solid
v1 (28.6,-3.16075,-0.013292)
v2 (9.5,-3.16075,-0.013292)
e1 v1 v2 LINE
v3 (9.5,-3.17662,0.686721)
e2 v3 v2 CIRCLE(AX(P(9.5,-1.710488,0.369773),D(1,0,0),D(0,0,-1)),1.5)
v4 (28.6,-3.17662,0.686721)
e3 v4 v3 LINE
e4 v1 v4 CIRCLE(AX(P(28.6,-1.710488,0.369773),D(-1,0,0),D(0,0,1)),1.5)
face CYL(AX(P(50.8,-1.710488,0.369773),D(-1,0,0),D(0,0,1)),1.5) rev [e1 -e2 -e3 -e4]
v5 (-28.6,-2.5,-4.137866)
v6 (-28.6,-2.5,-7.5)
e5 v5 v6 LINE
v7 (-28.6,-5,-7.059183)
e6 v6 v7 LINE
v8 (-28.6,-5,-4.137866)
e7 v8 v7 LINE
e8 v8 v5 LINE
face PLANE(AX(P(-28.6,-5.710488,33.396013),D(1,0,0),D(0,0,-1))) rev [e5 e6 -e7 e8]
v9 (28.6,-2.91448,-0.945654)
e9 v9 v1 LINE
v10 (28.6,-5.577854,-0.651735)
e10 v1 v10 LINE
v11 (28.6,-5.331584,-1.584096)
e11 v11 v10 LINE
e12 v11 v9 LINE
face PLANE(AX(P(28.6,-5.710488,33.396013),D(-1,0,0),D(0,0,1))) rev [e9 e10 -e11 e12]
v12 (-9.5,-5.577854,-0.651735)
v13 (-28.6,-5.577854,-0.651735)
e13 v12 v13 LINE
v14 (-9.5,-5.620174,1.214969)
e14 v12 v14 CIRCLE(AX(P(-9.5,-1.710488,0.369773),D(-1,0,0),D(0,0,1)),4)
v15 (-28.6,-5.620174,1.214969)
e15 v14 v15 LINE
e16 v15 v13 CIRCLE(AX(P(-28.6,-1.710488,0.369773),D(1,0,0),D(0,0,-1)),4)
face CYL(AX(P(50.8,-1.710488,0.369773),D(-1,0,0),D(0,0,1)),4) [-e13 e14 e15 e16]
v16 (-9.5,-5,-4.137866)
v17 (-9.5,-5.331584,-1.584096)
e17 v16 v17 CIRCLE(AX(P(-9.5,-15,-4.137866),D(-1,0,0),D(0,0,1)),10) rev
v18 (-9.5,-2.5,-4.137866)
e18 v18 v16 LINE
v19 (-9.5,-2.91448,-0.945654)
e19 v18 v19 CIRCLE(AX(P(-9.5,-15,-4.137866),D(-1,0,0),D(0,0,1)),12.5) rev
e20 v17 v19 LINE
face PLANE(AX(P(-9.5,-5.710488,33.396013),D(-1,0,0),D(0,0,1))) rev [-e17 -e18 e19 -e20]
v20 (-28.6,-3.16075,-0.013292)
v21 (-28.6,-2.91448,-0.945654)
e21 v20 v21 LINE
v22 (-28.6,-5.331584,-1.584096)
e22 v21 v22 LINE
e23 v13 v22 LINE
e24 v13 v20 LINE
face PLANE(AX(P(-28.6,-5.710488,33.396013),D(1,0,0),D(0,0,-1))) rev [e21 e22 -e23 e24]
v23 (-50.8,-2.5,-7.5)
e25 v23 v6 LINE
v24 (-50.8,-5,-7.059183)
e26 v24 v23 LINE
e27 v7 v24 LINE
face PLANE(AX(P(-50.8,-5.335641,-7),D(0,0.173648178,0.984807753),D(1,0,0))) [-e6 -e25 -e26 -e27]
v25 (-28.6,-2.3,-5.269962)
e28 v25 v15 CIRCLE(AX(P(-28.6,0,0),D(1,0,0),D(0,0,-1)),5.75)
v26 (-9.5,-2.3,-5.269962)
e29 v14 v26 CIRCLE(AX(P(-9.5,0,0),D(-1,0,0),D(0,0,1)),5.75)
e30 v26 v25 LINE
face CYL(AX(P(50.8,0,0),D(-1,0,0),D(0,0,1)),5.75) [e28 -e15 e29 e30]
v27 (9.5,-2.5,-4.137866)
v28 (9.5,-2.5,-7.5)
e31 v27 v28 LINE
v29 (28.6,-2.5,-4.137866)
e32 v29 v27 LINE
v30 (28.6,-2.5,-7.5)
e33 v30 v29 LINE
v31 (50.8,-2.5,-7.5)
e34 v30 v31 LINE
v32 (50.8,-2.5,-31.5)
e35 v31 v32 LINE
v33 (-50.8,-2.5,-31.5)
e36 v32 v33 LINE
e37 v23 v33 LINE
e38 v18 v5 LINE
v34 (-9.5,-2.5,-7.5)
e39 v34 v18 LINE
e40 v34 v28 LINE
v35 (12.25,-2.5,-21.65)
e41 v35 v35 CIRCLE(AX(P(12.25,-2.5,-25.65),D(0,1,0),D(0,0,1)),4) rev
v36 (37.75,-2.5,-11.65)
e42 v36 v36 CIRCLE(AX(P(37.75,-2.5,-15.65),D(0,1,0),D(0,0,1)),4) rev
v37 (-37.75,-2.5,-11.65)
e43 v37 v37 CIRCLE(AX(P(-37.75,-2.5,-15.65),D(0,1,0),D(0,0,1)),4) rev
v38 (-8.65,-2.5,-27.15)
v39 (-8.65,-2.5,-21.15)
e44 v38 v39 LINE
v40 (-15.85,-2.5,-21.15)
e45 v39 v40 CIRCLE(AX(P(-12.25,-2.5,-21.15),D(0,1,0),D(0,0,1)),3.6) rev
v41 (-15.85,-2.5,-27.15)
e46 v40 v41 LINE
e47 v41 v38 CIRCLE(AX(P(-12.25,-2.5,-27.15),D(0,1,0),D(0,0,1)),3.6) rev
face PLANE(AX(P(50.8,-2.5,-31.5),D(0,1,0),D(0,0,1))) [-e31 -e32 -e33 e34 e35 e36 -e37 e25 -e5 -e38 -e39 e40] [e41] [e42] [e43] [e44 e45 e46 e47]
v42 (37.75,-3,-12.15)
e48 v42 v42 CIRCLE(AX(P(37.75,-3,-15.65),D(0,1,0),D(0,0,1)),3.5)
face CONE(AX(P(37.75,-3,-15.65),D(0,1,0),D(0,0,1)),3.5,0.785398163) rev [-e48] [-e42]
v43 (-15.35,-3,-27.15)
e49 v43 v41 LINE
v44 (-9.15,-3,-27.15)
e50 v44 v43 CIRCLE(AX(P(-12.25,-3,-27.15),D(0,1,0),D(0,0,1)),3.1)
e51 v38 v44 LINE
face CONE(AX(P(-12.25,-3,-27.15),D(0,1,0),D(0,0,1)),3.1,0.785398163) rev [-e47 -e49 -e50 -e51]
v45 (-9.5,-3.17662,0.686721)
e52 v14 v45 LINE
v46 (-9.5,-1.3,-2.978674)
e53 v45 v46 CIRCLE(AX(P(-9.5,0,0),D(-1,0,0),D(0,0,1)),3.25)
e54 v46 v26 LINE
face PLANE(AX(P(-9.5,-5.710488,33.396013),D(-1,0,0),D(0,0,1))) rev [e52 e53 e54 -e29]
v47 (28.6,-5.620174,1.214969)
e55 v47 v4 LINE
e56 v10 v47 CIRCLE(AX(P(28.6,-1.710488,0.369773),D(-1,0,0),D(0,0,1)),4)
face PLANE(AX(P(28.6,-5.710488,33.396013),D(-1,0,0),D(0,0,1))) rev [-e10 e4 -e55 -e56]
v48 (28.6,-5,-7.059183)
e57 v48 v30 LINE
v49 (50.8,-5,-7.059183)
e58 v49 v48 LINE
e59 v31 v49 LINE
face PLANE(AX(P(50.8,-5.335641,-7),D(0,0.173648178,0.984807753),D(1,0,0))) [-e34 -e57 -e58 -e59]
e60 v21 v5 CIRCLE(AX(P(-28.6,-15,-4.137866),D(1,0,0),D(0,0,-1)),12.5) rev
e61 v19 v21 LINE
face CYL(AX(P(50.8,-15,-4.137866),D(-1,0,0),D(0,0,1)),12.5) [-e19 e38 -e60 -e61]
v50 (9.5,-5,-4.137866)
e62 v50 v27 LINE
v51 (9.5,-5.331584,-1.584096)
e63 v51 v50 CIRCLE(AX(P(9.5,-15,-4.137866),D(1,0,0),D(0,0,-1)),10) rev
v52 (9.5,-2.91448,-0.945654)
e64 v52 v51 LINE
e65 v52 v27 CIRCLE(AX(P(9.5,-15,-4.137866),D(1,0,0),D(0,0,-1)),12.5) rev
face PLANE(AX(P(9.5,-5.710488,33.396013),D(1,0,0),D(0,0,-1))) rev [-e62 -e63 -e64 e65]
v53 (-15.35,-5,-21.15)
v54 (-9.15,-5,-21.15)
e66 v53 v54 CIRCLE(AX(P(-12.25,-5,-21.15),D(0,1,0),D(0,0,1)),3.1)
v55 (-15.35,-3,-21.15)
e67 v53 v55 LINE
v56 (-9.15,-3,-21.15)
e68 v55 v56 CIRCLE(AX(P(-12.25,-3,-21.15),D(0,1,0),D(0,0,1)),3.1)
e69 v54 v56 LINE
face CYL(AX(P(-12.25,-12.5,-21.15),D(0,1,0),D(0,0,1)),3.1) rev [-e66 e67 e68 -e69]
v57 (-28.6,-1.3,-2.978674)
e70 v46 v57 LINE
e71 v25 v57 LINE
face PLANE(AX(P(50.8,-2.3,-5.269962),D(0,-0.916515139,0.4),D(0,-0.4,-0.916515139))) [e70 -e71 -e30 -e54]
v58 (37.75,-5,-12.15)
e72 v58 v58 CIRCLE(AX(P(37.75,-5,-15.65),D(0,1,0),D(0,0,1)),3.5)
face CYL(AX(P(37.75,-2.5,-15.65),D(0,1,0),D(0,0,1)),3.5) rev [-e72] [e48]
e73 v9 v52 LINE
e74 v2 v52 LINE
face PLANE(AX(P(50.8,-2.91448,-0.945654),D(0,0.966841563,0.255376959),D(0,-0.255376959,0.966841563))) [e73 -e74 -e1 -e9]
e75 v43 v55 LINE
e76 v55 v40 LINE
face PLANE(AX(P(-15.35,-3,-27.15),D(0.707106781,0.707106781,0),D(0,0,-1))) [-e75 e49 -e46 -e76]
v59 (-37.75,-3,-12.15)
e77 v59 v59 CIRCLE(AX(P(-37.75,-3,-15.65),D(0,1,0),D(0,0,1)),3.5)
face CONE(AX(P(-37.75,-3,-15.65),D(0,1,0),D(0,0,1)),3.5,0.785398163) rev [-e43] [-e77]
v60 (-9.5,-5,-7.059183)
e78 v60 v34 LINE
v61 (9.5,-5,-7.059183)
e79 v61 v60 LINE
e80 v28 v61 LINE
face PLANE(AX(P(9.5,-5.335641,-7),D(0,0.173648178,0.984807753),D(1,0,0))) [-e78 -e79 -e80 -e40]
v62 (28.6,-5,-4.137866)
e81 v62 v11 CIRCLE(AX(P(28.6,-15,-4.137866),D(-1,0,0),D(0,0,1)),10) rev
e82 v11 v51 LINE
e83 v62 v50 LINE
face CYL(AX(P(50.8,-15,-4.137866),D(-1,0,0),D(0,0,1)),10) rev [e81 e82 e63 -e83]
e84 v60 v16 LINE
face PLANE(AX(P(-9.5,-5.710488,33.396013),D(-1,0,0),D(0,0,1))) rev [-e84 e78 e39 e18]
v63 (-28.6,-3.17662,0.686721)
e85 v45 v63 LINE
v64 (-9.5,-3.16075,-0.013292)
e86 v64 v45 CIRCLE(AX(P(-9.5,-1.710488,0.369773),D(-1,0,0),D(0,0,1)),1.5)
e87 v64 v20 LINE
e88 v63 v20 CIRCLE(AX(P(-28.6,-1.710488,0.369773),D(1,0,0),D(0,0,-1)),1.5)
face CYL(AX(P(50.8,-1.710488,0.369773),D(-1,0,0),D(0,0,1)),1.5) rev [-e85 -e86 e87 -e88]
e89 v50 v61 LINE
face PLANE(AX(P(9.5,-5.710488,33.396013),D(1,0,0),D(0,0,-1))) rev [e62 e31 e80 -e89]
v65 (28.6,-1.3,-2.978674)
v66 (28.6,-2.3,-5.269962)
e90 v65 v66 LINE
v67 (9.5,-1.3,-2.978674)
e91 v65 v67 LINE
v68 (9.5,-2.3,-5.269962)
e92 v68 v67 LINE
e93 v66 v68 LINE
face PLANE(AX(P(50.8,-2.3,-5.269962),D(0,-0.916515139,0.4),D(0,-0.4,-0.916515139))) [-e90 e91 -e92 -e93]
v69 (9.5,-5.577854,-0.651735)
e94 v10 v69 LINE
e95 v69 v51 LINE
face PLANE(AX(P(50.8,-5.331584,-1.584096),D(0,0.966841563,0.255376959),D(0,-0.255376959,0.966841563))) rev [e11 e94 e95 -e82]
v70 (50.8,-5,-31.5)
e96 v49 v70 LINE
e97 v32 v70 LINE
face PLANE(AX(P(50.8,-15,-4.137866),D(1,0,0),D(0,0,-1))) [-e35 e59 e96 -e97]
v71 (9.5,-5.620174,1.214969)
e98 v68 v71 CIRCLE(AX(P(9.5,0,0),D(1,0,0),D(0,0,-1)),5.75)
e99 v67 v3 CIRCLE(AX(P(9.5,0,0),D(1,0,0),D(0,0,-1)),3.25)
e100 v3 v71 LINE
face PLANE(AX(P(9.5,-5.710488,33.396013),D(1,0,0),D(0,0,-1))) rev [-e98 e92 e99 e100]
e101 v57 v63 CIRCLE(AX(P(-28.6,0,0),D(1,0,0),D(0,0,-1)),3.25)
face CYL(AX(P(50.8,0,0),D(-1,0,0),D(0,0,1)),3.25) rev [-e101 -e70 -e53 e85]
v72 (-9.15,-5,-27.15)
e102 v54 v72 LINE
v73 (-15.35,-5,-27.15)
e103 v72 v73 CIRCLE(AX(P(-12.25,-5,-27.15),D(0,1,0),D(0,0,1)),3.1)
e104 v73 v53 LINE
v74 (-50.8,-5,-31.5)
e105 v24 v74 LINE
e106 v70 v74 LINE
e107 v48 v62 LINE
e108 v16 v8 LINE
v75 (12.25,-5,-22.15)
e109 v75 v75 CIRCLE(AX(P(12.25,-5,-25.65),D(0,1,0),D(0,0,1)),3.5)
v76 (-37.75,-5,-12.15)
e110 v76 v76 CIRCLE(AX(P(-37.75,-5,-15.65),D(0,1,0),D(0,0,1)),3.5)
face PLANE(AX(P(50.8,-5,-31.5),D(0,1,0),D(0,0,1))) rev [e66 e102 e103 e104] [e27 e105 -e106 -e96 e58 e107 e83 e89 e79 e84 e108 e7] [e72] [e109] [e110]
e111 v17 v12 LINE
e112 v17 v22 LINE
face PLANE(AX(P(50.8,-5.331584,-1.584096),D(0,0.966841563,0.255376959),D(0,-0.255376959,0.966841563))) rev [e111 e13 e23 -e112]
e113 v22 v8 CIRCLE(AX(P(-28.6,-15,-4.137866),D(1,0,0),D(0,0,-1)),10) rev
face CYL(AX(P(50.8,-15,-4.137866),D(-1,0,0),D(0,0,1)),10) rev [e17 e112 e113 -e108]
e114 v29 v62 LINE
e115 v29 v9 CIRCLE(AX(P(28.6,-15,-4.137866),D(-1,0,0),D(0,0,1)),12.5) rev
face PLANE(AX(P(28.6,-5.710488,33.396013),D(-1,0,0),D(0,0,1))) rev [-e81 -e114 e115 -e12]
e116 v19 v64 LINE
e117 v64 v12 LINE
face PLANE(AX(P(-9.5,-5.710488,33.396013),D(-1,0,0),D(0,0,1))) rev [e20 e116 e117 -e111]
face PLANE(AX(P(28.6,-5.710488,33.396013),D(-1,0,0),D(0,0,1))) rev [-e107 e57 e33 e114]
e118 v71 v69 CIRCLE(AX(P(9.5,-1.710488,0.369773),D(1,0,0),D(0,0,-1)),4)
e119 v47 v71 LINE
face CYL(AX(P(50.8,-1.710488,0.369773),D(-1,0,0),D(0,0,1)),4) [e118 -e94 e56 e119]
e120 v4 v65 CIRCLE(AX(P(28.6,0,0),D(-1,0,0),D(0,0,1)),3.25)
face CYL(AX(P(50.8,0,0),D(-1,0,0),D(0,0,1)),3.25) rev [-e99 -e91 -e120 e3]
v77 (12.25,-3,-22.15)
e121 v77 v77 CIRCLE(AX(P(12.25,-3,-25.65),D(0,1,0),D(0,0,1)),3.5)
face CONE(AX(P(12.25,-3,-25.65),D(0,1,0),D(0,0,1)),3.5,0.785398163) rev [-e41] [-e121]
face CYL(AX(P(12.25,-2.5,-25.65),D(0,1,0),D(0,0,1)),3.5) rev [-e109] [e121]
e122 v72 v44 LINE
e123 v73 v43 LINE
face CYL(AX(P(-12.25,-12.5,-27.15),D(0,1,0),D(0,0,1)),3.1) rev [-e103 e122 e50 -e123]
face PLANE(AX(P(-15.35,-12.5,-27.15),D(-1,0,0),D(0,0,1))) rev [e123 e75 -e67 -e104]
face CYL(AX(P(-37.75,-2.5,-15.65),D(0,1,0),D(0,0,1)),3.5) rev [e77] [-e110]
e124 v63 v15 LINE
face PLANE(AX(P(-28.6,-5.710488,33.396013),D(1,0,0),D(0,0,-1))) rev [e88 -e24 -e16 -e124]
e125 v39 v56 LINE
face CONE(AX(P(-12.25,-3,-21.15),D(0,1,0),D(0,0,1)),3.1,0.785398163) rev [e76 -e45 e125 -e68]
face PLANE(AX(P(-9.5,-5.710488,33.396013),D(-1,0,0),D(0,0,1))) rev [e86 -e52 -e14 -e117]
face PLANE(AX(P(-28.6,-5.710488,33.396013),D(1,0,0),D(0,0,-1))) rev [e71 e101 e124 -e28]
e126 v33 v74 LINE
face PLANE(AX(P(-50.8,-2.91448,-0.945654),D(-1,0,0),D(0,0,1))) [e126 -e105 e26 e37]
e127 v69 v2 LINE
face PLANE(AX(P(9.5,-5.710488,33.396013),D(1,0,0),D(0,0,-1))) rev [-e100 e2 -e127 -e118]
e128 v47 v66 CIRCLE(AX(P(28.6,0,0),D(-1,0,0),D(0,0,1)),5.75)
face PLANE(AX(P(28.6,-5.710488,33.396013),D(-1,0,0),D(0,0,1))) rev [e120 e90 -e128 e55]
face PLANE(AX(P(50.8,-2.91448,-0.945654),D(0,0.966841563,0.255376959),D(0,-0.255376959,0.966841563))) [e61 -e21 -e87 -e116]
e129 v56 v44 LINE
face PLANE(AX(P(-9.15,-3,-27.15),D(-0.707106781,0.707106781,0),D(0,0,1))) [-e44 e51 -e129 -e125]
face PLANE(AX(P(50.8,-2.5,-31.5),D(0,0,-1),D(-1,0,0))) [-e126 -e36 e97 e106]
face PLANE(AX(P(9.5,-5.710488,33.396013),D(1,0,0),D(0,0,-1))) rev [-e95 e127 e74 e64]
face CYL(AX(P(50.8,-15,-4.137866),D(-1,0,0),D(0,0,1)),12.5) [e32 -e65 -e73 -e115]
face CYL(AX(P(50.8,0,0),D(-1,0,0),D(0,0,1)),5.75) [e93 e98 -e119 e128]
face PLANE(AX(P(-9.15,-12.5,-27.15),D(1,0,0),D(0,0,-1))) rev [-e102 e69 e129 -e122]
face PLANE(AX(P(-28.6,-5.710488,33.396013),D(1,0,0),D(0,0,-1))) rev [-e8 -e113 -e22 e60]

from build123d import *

# Parameters (mm, degrees)
BASE_FLANGE1_DEPTH           = 50.8
CUT_EXTRUDE1_DEPTH           = 61.049583679
CUT_EXTRUDE1_DEPTH_BACK      = 61.049583679
SKETCH6_W                    = 22.2
SKETCH6_H                    = 40.396012785
SKETCH6_W_2                  = 19
F_7_0_7_DIAMETER_HOLE1_D     = 7
F_7_0_7_DIAMETER_HOLE1_DEPTH = 10
F_7_0_7_DIAMETER_HOLE1_TIP   = 2.103012167
CUT_EXTRUDE2_DEPTH           = 10
CHAMFER1_SIZE                = 0.5
CHAMFER2_SIZE                = 0.5
CHAMFER2_SIZE_2              = 2.83564091


# Sheet-metal steps are written as plain solids
with BuildPart() as part:
    # Sketch1 → Base-Flange1 (new, symmetric)
    with BuildSketch(Plane(origin=(0, 0, 0), x_dir=(0, 0, -1), z_dir=(1, 0, 0))):
        with BuildLine():
            Line((31.5, -5), (4.137865616, -5))
            ThreePointArc((4.137865616, -5), (2.850262482, -5.083242558), (1.584096024, -5.331584366))
            Line((1.584096024, -5.331584366), (0.651734752, -5.577853864))
            ThreePointArc((0.651734752, -5.577853864), (-0.279113067, -5.709460074), (-1.214968707, -5.620173577))
            ThreePointArc((-1.214968707, -5.620173577), (-2.620425709, 5.118190022), (5.269962049, -2.3))
            Line((5.269962049, -2.3), (2.978674202, -1.3))
            ThreePointArc((2.978674202, -1.3), (-1.481110183, 2.892890013), (-0.686721443, -3.176619848))
            ThreePointArc((-0.686721443, -3.176619848), (-0.335775578, -3.210102284), (0.013292354, -3.160749956))
            Line((0.013292354, -3.160749956), (0.945653625, -2.914480458))
            ThreePointArc((0.945653625, -2.914480458), (2.528361698, -2.604053197), (4.137865616, -2.5))
            Line((4.137865616, -2.5), (31.5, -2.5))
            Line((31.5, -2.5), (31.5, -5))
        make_face()
    extrude(amount=BASE_FLANGE1_DEPTH, both=True)

    # Sketch6 → Cut-Extrude1 (cut, two sides: drawn at the far end of the back side and taken through both)
    with BuildSketch(Plane(origin=(0, 0, 0), x_dir=(1, 0, 0), z_dir=(0, 1, 0)).offset(-CUT_EXTRUDE1_DEPTH_BACK)):
        with Locations((-39.7, -13.198006393)):
            Rectangle(SKETCH6_W, SKETCH6_H)
        with Locations((39.7, -13.198006393)):
            Rectangle(SKETCH6_W, SKETCH6_H)
        with Locations((0, -13.198006393)):
            Rectangle(SKETCH6_W_2, SKETCH6_H)
    extrude(amount=CUT_EXTRUDE1_DEPTH + CUT_EXTRUDE1_DEPTH_BACK, mode=Mode.SUBTRACT)

    # Ø7.0 (7) Diameter Hole1
    with Locations(Plane(origin=(0, -2.5, 0), x_dir=(1, 0, 0), z_dir=(0, 1, 0))):
        with Locations((37.75, 15.65), (-37.75, 15.65), (12.25, 25.65)):
            Hole(F_7_0_7_DIAMETER_HOLE1_D / 2, depth=F_7_0_7_DIAMETER_HOLE1_DEPTH)
            with Locations((0, 0, -(F_7_0_7_DIAMETER_HOLE1_DEPTH + F_7_0_7_DIAMETER_HOLE1_TIP / 2))):  # 118° drill point
                Cone(0, F_7_0_7_DIAMETER_HOLE1_D / 2, F_7_0_7_DIAMETER_HOLE1_TIP, mode=Mode.SUBTRACT)

    # Sketch9 → Cut-Extrude2 (cut)
    with BuildSketch(Plane(origin=(0, -2.5, 0), x_dir=(1, 0, 0), z_dir=(0, 1, 0))):
        with BuildLine():
            Line((-9.15, 27.15), (-9.15, 21.15))
            ThreePointArc((-9.15, 21.15), (-12.25, 18.05), (-15.35, 21.15))
            Line((-15.35, 21.15), (-15.35, 27.15))
            ThreePointArc((-15.35, 27.15), (-12.25, 30.25), (-9.15, 27.15))
        make_face()
    extrude(amount=-CUT_EXTRUDE2_DEPTH, mode=Mode.SUBTRACT)

    # Chamfer1
    chamfer1_edges = [part.edges().sort_by_distance(p)[0] for p in [
        (15.75, -2.5, -25.65),
        (-34.25, -2.5, -15.65),
        (41.25, -2.5, -15.65),
        (-12.25, -2.5, -30.25),
        (-15.35, -2.5, -24.15),
        (-12.25, -2.5, -18.05),
        (-9.15, -2.5, -24.15),
    ]]
    chamfer(chamfer1_edges, length=CHAMFER1_SIZE)

    # Chamfer2
    # the kernel refuses this chamfer: 2.83564091, 0.5 mm, written as the material it takes off along each edge
    with BuildSketch(Plane(origin=(-28.6, -2.5, -7), x_dir=(0, 0.21013876076743535, -0.9776715712462578), z_dir=(-1, 0, 0))) as chamfer2_piece_1:
        Polygon((CHAMFER2_SIZE * 0.977671571246, CHAMFER2_SIZE * 0.210138760767), (-CHAMFER2_SIZE_2 * 0.210138760753, CHAMFER2_SIZE_2 * 0.97767157118), (0, 0), align=None)
    extrude(amount=29.568522917, mode=Mode.SUBTRACT)
    with BuildSketch(Plane(origin=(-9.5, -2.5, -7), x_dir=(0, 0.21013876076743535, -0.9776715712462578), z_dir=(1, 0, 0))) as chamfer2_piece_2:
        Polygon((CHAMFER2_SIZE * 0.977671571246, -CHAMFER2_SIZE * 0.210138760767), (-CHAMFER2_SIZE_2 * 0.210138760753, -CHAMFER2_SIZE_2 * 0.97767157118), (0, 0), align=None)
    extrude(amount=19, mode=Mode.SUBTRACT)
    with BuildSketch(Plane(origin=(28.6, -2.5, -7), x_dir=(0, 0.21013876076743535, -0.9776715712462578), z_dir=(1, 0, 0))) as chamfer2_piece_3:
        Polygon((CHAMFER2_SIZE * 0.977671571246, -CHAMFER2_SIZE * 0.210138760767), (-CHAMFER2_SIZE_2 * 0.210138760753, -CHAMFER2_SIZE_2 * 0.97767157118), (0, 0), align=None)
    extrude(amount=29.568522917, mode=Mode.SUBTRACT)


solid = part.part
